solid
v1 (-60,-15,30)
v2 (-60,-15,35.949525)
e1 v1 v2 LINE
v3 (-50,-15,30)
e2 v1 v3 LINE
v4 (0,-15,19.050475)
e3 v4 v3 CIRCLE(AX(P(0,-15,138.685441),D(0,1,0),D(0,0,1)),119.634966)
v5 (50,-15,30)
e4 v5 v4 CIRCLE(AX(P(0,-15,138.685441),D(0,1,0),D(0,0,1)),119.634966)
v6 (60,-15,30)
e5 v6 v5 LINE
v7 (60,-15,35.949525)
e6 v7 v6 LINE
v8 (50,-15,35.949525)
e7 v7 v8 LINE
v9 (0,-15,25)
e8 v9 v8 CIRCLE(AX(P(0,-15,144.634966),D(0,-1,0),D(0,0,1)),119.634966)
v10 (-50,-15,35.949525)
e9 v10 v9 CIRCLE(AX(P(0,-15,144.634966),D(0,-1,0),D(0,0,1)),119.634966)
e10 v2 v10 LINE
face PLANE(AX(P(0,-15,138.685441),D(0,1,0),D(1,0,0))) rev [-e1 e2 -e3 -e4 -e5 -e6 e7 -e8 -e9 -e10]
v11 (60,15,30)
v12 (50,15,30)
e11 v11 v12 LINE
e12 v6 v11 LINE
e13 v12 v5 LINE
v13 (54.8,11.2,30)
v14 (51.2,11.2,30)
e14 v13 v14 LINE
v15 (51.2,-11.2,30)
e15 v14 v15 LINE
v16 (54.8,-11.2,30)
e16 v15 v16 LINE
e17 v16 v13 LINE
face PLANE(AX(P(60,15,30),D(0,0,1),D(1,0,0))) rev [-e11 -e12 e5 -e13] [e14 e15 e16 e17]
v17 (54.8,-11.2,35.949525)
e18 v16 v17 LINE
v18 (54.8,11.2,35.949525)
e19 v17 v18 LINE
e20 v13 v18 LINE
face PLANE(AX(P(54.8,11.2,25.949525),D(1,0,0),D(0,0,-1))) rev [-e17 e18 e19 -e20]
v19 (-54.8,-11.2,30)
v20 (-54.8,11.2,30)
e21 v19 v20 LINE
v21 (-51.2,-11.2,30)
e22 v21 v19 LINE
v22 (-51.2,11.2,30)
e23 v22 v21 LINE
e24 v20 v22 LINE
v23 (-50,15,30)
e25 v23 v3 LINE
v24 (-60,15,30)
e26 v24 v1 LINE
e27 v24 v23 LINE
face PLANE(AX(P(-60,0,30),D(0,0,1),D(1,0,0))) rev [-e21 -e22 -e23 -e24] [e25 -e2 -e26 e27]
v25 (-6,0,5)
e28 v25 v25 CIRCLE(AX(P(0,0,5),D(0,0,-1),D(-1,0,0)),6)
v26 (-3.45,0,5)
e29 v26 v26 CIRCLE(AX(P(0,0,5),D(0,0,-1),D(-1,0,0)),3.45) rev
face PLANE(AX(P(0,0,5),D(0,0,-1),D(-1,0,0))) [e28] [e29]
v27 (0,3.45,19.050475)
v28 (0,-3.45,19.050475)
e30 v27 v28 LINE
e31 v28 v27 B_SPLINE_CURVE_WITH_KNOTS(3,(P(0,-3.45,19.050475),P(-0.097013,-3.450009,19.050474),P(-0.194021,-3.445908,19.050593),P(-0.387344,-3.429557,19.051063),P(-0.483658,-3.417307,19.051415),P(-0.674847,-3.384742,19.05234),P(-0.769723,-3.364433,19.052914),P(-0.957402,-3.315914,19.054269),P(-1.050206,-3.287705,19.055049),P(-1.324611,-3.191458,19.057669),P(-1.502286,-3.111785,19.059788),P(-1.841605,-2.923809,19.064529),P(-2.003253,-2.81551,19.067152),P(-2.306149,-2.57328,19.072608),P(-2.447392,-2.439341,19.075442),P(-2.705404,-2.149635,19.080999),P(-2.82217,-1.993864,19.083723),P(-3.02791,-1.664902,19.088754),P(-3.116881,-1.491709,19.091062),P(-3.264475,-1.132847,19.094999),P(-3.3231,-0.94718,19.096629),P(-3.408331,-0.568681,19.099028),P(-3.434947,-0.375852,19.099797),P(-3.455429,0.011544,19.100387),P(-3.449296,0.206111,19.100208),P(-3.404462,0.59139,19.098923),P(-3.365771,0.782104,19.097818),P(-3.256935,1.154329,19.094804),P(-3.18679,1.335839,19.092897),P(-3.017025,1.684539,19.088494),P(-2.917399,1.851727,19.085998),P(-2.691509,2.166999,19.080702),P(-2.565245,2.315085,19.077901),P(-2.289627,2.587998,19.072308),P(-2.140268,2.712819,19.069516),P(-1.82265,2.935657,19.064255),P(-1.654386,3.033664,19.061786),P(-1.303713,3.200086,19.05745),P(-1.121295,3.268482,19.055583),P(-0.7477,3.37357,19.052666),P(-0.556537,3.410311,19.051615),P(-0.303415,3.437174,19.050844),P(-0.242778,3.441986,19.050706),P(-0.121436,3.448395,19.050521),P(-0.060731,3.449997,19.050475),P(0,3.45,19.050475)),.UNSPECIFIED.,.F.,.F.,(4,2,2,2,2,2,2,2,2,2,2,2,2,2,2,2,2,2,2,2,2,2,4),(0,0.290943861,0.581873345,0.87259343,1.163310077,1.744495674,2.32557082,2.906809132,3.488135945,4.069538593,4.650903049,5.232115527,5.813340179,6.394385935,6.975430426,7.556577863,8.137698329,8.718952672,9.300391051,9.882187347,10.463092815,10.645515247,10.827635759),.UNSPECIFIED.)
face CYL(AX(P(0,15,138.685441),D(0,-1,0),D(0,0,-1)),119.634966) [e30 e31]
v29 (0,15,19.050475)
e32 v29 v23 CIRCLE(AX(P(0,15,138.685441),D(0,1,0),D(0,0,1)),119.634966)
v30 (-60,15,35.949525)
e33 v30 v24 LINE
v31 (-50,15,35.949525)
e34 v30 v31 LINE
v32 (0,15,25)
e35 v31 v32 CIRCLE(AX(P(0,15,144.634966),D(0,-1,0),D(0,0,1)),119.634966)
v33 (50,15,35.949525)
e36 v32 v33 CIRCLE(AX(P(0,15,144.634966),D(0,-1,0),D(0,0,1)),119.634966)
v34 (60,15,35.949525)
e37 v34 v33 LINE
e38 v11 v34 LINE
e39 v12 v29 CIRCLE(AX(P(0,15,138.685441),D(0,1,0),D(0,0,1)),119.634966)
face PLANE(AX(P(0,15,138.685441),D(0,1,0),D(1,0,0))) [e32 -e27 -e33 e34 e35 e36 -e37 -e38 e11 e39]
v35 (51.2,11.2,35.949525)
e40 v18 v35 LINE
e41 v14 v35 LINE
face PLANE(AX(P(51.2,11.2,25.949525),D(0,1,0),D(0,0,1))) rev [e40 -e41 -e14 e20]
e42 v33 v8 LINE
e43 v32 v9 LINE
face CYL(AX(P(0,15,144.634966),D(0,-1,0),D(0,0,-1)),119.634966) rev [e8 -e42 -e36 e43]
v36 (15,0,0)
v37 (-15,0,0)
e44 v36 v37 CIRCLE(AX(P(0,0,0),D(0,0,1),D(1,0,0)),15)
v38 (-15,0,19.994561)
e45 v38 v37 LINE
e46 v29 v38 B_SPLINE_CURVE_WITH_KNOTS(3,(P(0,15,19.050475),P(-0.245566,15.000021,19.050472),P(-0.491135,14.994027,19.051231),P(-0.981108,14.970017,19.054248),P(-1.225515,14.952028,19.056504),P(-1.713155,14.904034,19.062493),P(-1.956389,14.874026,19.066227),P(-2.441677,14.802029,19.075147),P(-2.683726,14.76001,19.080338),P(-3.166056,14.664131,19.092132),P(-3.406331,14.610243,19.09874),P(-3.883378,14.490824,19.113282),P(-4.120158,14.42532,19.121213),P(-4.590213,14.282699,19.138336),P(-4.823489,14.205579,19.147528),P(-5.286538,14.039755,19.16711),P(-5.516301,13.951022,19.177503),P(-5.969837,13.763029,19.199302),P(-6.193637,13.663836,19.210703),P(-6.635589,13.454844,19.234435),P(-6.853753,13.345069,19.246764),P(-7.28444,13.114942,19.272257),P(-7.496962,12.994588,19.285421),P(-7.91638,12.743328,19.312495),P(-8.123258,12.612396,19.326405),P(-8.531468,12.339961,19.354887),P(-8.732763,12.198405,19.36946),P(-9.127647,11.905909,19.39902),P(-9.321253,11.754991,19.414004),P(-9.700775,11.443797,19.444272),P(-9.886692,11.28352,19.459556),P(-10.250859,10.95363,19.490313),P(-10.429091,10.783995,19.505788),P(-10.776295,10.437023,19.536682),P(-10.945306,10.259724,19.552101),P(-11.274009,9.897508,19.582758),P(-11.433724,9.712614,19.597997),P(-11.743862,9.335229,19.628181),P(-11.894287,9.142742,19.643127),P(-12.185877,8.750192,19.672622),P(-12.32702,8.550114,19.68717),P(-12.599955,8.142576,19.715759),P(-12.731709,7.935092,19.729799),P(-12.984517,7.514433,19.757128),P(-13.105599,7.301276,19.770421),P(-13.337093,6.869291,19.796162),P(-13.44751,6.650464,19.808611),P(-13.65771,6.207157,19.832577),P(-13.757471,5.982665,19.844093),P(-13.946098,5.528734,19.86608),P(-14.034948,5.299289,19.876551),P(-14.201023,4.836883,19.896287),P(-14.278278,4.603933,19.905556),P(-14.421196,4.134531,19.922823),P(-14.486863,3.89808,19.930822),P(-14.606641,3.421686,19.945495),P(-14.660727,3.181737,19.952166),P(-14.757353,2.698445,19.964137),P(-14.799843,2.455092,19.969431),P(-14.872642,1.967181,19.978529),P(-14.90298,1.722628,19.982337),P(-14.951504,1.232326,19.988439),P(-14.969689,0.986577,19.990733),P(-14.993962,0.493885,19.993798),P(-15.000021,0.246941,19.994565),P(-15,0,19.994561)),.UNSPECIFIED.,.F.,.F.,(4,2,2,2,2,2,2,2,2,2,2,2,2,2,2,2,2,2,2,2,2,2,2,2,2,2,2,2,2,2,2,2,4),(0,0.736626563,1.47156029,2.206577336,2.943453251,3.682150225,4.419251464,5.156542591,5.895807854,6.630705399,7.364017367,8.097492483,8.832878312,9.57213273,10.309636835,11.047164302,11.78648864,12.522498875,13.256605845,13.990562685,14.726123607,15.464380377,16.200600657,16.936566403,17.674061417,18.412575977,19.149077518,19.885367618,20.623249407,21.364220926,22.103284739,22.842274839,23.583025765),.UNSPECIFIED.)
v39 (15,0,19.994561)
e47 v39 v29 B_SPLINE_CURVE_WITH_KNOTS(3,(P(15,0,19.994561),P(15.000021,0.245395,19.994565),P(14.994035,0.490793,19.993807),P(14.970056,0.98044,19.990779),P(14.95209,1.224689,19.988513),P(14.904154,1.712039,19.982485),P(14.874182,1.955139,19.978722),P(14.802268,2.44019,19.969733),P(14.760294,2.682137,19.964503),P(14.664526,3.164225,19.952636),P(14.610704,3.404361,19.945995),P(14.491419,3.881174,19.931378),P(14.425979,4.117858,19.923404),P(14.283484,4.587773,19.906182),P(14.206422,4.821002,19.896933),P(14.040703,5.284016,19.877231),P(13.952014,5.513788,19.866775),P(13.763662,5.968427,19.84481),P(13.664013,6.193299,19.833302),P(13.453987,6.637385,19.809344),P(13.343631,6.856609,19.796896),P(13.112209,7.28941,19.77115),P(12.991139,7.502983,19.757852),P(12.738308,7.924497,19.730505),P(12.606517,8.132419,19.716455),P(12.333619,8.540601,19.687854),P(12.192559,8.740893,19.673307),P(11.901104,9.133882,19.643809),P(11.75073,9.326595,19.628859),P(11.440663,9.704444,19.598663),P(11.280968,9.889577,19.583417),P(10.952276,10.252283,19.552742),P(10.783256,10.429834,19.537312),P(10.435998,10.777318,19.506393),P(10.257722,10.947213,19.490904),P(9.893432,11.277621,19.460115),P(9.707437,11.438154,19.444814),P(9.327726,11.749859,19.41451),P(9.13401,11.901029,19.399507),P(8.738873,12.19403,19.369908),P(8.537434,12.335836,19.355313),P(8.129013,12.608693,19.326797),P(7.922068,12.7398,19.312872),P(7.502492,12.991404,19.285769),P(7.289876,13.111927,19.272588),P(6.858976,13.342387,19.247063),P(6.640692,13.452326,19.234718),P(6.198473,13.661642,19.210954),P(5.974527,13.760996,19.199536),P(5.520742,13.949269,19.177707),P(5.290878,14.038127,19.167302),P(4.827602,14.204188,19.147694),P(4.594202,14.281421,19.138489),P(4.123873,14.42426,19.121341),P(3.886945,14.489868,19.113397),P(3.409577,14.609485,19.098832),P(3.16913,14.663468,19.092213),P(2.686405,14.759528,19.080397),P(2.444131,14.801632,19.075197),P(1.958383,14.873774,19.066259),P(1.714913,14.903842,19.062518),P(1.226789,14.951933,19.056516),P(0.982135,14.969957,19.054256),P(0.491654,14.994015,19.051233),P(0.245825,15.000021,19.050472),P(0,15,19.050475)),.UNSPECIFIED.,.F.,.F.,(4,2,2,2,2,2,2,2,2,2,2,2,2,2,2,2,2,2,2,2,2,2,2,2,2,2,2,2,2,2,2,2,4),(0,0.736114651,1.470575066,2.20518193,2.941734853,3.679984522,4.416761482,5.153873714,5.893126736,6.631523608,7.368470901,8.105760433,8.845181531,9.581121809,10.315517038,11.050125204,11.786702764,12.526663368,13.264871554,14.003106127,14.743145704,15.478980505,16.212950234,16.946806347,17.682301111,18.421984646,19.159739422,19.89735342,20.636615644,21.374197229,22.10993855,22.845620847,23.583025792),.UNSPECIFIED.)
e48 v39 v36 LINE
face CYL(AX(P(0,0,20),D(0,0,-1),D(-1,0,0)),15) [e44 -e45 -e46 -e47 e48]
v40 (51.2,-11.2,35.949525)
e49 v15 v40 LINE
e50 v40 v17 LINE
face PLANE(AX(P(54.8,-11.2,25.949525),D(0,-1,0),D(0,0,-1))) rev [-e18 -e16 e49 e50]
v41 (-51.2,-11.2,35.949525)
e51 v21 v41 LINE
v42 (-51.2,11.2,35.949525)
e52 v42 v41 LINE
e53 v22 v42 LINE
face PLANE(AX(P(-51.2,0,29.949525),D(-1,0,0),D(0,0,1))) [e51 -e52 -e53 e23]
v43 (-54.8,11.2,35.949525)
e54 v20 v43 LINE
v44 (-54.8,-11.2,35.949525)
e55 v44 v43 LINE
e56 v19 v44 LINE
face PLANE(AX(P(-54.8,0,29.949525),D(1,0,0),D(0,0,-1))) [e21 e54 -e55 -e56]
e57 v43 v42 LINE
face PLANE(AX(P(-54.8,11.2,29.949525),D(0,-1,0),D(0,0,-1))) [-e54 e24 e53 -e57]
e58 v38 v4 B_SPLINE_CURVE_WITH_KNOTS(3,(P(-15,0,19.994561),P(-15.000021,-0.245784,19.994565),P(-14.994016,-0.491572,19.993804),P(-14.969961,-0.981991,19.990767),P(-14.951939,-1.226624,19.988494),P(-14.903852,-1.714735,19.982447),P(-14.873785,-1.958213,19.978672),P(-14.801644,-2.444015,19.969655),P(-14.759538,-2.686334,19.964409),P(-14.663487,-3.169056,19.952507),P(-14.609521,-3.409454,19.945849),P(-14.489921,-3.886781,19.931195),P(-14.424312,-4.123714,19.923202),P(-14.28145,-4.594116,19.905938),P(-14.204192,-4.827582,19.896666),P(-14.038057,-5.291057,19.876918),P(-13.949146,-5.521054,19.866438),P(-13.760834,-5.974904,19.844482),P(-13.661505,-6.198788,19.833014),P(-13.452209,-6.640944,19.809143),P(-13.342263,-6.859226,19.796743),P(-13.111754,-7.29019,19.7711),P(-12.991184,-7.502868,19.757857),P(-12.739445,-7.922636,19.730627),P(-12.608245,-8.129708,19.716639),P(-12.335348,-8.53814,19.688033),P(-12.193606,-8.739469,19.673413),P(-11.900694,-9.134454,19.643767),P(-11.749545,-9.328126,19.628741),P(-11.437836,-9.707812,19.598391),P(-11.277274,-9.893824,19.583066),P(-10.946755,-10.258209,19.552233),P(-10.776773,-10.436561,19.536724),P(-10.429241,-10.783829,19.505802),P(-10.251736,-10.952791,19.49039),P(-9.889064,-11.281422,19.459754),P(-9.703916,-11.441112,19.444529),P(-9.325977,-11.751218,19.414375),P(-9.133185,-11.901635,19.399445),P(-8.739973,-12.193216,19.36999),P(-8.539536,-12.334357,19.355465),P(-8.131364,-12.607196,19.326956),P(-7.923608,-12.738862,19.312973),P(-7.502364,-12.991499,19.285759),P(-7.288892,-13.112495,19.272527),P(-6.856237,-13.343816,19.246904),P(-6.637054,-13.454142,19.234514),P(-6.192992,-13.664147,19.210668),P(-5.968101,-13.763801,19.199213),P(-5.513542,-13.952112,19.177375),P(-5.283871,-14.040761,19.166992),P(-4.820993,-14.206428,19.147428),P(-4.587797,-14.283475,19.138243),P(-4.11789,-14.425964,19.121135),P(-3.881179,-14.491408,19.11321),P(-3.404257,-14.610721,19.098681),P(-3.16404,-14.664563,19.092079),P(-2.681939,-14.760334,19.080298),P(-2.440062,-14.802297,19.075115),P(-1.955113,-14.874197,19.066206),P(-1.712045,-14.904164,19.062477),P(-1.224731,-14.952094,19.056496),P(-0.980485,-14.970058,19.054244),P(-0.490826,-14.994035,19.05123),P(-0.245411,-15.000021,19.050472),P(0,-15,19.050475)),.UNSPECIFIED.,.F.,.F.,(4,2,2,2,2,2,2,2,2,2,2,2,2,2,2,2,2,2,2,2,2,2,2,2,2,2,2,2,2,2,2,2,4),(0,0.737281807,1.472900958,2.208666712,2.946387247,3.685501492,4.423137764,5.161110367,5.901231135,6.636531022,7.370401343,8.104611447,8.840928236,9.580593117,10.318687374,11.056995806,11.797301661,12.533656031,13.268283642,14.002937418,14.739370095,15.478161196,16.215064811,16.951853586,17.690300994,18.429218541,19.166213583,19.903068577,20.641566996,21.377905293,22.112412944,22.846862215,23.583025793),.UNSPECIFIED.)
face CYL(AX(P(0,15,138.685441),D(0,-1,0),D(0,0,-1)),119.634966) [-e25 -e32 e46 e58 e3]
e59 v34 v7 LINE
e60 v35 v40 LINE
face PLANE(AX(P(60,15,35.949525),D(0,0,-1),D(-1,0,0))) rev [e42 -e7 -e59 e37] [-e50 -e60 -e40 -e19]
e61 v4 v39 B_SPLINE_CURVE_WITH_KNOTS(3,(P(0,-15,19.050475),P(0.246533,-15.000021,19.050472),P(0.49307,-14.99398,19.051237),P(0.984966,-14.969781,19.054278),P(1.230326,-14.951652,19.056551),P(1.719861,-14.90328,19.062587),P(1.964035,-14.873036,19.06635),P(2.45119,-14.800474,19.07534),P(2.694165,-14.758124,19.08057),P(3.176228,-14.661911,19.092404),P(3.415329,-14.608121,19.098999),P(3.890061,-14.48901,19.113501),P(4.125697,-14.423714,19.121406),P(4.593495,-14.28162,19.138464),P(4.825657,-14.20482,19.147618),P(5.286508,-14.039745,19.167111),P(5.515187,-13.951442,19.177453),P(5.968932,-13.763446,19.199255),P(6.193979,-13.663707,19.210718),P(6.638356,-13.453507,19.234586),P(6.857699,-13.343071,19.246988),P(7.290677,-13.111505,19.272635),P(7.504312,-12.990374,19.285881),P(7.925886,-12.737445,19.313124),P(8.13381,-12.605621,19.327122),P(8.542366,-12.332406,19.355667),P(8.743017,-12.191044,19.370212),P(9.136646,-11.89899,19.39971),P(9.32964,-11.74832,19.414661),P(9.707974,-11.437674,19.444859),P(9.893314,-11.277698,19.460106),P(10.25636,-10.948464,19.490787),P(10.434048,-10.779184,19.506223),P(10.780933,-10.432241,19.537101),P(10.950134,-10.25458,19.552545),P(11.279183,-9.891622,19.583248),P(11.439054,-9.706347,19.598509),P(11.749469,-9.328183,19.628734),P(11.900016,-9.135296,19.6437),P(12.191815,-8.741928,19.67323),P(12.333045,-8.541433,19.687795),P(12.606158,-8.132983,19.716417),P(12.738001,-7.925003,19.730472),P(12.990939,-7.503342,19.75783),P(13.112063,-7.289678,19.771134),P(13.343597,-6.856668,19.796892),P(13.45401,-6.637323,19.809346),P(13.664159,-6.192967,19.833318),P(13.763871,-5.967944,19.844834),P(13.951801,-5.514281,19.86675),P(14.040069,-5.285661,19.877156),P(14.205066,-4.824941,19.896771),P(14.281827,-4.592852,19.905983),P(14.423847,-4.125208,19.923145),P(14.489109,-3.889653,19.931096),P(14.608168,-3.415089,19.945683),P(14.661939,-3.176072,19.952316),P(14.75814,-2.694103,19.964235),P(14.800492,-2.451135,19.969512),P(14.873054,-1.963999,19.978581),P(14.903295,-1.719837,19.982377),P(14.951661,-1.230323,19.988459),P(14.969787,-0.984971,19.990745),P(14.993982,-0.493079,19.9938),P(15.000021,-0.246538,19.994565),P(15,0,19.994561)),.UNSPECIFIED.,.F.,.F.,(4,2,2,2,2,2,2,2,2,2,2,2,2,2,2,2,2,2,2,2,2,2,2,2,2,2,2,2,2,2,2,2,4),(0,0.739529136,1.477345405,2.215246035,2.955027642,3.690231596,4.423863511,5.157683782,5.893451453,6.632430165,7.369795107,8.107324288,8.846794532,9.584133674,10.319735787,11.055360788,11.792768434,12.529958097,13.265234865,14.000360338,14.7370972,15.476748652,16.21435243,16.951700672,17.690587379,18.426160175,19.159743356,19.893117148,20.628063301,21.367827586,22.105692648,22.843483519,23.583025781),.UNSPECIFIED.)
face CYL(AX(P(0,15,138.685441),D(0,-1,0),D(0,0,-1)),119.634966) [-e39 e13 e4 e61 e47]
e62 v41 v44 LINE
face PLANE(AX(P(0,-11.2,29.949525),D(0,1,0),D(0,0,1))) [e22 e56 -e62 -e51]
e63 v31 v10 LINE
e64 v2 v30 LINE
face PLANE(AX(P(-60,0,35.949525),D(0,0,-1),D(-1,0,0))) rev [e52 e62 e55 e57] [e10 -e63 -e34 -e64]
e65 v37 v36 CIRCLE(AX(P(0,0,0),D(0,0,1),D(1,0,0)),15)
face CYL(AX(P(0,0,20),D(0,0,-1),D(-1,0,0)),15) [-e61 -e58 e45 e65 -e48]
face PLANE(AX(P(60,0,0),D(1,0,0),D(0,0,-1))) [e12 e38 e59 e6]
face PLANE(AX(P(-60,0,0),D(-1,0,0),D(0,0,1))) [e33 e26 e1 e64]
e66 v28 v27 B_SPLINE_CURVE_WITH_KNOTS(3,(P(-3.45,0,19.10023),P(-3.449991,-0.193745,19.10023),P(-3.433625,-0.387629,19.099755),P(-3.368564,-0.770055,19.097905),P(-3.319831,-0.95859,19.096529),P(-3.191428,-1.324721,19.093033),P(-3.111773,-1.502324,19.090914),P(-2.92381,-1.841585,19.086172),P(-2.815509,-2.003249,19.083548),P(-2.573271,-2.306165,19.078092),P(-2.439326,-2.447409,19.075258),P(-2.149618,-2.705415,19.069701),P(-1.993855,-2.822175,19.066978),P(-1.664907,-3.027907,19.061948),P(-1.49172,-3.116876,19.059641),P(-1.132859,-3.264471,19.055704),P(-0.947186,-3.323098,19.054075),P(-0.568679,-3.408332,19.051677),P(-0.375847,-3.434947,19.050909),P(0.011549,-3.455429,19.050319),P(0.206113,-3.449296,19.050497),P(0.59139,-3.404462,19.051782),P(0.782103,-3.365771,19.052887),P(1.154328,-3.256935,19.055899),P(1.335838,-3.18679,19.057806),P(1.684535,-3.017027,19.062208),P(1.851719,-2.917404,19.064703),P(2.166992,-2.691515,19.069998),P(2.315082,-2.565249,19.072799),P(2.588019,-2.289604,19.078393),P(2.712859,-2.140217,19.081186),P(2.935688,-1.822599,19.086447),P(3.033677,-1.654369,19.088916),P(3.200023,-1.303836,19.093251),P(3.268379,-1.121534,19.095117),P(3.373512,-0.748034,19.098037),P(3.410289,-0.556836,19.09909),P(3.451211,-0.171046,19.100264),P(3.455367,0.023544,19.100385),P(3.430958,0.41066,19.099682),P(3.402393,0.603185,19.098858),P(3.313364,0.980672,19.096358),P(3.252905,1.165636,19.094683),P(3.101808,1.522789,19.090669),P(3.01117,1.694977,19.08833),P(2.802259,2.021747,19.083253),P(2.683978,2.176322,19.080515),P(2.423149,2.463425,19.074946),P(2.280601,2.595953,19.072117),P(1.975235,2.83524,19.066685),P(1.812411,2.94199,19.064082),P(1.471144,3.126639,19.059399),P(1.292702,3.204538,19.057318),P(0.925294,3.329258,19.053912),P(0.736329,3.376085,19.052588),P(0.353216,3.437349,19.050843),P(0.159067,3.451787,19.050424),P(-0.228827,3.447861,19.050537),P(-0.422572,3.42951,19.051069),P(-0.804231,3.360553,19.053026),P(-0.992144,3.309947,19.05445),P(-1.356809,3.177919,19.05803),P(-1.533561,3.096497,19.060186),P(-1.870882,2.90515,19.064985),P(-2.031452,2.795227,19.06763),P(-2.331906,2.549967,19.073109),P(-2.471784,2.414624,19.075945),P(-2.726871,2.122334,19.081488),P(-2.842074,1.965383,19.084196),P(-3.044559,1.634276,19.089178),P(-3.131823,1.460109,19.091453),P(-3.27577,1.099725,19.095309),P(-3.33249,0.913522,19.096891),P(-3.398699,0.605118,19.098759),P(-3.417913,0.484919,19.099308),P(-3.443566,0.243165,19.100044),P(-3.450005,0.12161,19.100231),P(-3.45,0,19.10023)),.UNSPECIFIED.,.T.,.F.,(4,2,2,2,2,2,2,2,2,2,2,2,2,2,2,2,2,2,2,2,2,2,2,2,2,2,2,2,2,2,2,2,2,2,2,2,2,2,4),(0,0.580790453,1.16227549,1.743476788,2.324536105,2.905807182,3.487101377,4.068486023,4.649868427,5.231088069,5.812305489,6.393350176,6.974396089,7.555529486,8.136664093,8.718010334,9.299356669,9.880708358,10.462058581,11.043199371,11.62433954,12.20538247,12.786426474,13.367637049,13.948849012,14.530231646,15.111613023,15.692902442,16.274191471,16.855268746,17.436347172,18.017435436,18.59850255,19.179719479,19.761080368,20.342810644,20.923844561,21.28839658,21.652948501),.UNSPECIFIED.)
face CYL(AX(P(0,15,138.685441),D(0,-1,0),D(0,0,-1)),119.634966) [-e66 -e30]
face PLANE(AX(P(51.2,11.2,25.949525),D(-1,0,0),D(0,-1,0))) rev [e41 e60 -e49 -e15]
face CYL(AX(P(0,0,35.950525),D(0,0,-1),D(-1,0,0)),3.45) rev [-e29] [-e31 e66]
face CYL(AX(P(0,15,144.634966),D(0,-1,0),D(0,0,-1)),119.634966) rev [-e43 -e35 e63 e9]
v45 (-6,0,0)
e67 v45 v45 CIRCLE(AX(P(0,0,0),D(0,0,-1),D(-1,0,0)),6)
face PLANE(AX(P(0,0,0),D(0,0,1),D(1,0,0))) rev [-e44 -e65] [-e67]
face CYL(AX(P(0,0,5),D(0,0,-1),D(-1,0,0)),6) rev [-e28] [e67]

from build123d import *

# Parameters (mm, degrees)
BOSS_EXTRUDE1_START         = -15
BOSS_EXTRUDE1_DEPTH         = 30
BOSS_EXTRUDE1_START_2       = -12.7
BOSS_EXTRUDE1_2_OUTLINE_W   = 10
BOSS_EXTRUDE1_2_OUTLINE_H   = 5.949524979
BOSS_EXTRUDE1_2_DEPTH       = 25.4
BOSS_EXTRUDE1_3_OUTLINE_R   = 15
BOSS_EXTRUDE1_3_OUTLINE_R_2 = 4.55
BOSS_EXTRUDE1_3_DEPTH       = 19.994560744
SKETCH4_W                   = 3.6
SKETCH4_H                   = 22.4
CUT_EXTRUDE1_DEPTH          = 6
BOSS_EXTRUDE2_REACH         = 73.536
BOSS_EXTRUDE2_END_RADIUS    = 119.634966004
SKETCH9_R                   = 6.57997386
SKETCH9_R_2                 = 3.45
SKETCH10_W                  = 5.949524979
SKETCH10_H                  = 2.3
BOSS_EXTRUDE3_DEPTH         = 10
SKETCH11_W                  = 5.949524979
SKETCH11_H                  = 30
BOSS_EXTRUDE4_DEPTH         = 10
SKETCH13_W                  = 3.6
SKETCH13_H                  = 22.4
CUT_EXTRUDE2_DEPTH          = 10
SKETCH15_R                  = 6
CUT_EXTRUDE3_DEPTH          = 5


with BuildPart() as part:
    # Boss-Extrude1: read off the stored shape, not the designer's step
    # Boss-Extrude1 outline → Boss-Extrude1 (new body)
    with BuildSketch(Plane(origin=(0, 0, 0), x_dir=(1, 0, 0), z_dir=(0, 1, 0)).offset(BOSS_EXTRUDE1_START)):
        with BuildLine():
            Line((-50, -30), (-50, -35.949524979))
            ThreePointArc((-50, -35.949524979), (-25.592440765, -27.769436157), (0, -25))
            ThreePointArc((0, -25), (25.592440765, -27.769436157), (50, -35.949524979))
            Line((50, -35.949524979), (50, -30))
            ThreePointArc((50, -30), (27.810549479, -22.327809439), (4.550000287, -19.13702996))
            ThreePointArc((4.550000287, -19.13702996), (2.275411741, -19.072115713), (0, -19.050475021))
            ThreePointArc((0, -19.050475021), (-25.592440765, -21.819911178), (-50, -30))
        make_face()
    extrude(amount=BOSS_EXTRUDE1_DEPTH)

    # Boss-Extrude1 2 outline → Boss-Extrude1 2 (add)
    with BuildSketch(Plane(origin=(0, 0, 0), x_dir=(1, 0, 0), z_dir=(0, 1, 0)).offset(BOSS_EXTRUDE1_START_2)):
        with Locations((-55, -32.97476249)):
            Rectangle(BOSS_EXTRUDE1_2_OUTLINE_W, BOSS_EXTRUDE1_2_OUTLINE_H)
    extrude(amount=BOSS_EXTRUDE1_2_DEPTH)

    # Boss-Extrude1 3 outline → Boss-Extrude1 3 (add)
    with BuildSketch(Plane.XY):
        Circle(BOSS_EXTRUDE1_3_OUTLINE_R)
        Circle(BOSS_EXTRUDE1_3_OUTLINE_R_2, mode=Mode.SUBTRACT)
    extrude(amount=BOSS_EXTRUDE1_3_DEPTH)

    # Sketch4 → Cut-Extrude1 (cut)
    with BuildSketch(Plane.XY.offset(35.949524979)):
        with Locations((-53, 0)):
            Rectangle(SKETCH4_W, SKETCH4_H)
    extrude(amount=-CUT_EXTRUDE1_DEPTH, mode=Mode.SUBTRACT)

    # Boss-Extrude2: up to this cylinder (the profile starts outside it)
    boss_extrude2_end = Plane(origin=(0, 0, 138.685441025), z_dir=(0, -1, 0)) * Cylinder(BOSS_EXTRUDE2_END_RADIUS, 387.341932008, mode=Mode.PRIVATE)
    # Sketch9 → Boss-Extrude2 (add, up to the surface)
    with BuildSketch(Plane(origin=(0, 0, 0), x_dir=(-1, 0, 0), z_dir=(0, 0, -1)), mode=Mode.PRIVATE) as boss_extrude2_sk1:
        Circle(SKETCH9_R)
        Circle(SKETCH9_R_2, mode=Mode.SUBTRACT)
    boss_extrude2_tool1 = extrude(boss_extrude2_sk1.sketch, amount=-BOSS_EXTRUDE2_REACH, mode=Mode.PRIVATE) - boss_extrude2_end
    add(boss_extrude2_tool1.solids().sort_by_distance((6.393864, 0, 0))[0])

    # Sketch10 → Boss-Extrude3 (add)
    with BuildSketch(Plane.ZY.offset(50)):
        with Locations((32.97476249, 13.85)):
            Rectangle(SKETCH10_W, SKETCH10_H)
        with Locations((32.97476249, -13.85)):
            Rectangle(SKETCH10_W, SKETCH10_H)
    extrude(amount=BOSS_EXTRUDE3_DEPTH)

    # Sketch11 → Boss-Extrude4 (add)
    with BuildSketch(Plane(origin=(50, 0, 0), x_dir=(0, 0, -1), z_dir=(1, 0, 0))):
        with Locations((-32.97476249, 0)):
            Rectangle(SKETCH11_W, SKETCH11_H)
    extrude(amount=BOSS_EXTRUDE4_DEPTH)

    # Sketch13 → Cut-Extrude2 (cut)
    with BuildSketch(Plane.XY.offset(35.949524979)):
        with Locations((53, 0)):
            Rectangle(SKETCH13_W, SKETCH13_H)
    extrude(amount=-CUT_EXTRUDE2_DEPTH, mode=Mode.SUBTRACT)

    # Sketch15 → Cut-Extrude3 (cut)
    with BuildSketch(Plane(origin=(0, 0, 0), x_dir=(-1, 0, 0), z_dir=(0, 0, -1))):
        Circle(SKETCH15_R)
    extrude(amount=-CUT_EXTRUDE3_DEPTH, mode=Mode.SUBTRACT)


solid = part.part
